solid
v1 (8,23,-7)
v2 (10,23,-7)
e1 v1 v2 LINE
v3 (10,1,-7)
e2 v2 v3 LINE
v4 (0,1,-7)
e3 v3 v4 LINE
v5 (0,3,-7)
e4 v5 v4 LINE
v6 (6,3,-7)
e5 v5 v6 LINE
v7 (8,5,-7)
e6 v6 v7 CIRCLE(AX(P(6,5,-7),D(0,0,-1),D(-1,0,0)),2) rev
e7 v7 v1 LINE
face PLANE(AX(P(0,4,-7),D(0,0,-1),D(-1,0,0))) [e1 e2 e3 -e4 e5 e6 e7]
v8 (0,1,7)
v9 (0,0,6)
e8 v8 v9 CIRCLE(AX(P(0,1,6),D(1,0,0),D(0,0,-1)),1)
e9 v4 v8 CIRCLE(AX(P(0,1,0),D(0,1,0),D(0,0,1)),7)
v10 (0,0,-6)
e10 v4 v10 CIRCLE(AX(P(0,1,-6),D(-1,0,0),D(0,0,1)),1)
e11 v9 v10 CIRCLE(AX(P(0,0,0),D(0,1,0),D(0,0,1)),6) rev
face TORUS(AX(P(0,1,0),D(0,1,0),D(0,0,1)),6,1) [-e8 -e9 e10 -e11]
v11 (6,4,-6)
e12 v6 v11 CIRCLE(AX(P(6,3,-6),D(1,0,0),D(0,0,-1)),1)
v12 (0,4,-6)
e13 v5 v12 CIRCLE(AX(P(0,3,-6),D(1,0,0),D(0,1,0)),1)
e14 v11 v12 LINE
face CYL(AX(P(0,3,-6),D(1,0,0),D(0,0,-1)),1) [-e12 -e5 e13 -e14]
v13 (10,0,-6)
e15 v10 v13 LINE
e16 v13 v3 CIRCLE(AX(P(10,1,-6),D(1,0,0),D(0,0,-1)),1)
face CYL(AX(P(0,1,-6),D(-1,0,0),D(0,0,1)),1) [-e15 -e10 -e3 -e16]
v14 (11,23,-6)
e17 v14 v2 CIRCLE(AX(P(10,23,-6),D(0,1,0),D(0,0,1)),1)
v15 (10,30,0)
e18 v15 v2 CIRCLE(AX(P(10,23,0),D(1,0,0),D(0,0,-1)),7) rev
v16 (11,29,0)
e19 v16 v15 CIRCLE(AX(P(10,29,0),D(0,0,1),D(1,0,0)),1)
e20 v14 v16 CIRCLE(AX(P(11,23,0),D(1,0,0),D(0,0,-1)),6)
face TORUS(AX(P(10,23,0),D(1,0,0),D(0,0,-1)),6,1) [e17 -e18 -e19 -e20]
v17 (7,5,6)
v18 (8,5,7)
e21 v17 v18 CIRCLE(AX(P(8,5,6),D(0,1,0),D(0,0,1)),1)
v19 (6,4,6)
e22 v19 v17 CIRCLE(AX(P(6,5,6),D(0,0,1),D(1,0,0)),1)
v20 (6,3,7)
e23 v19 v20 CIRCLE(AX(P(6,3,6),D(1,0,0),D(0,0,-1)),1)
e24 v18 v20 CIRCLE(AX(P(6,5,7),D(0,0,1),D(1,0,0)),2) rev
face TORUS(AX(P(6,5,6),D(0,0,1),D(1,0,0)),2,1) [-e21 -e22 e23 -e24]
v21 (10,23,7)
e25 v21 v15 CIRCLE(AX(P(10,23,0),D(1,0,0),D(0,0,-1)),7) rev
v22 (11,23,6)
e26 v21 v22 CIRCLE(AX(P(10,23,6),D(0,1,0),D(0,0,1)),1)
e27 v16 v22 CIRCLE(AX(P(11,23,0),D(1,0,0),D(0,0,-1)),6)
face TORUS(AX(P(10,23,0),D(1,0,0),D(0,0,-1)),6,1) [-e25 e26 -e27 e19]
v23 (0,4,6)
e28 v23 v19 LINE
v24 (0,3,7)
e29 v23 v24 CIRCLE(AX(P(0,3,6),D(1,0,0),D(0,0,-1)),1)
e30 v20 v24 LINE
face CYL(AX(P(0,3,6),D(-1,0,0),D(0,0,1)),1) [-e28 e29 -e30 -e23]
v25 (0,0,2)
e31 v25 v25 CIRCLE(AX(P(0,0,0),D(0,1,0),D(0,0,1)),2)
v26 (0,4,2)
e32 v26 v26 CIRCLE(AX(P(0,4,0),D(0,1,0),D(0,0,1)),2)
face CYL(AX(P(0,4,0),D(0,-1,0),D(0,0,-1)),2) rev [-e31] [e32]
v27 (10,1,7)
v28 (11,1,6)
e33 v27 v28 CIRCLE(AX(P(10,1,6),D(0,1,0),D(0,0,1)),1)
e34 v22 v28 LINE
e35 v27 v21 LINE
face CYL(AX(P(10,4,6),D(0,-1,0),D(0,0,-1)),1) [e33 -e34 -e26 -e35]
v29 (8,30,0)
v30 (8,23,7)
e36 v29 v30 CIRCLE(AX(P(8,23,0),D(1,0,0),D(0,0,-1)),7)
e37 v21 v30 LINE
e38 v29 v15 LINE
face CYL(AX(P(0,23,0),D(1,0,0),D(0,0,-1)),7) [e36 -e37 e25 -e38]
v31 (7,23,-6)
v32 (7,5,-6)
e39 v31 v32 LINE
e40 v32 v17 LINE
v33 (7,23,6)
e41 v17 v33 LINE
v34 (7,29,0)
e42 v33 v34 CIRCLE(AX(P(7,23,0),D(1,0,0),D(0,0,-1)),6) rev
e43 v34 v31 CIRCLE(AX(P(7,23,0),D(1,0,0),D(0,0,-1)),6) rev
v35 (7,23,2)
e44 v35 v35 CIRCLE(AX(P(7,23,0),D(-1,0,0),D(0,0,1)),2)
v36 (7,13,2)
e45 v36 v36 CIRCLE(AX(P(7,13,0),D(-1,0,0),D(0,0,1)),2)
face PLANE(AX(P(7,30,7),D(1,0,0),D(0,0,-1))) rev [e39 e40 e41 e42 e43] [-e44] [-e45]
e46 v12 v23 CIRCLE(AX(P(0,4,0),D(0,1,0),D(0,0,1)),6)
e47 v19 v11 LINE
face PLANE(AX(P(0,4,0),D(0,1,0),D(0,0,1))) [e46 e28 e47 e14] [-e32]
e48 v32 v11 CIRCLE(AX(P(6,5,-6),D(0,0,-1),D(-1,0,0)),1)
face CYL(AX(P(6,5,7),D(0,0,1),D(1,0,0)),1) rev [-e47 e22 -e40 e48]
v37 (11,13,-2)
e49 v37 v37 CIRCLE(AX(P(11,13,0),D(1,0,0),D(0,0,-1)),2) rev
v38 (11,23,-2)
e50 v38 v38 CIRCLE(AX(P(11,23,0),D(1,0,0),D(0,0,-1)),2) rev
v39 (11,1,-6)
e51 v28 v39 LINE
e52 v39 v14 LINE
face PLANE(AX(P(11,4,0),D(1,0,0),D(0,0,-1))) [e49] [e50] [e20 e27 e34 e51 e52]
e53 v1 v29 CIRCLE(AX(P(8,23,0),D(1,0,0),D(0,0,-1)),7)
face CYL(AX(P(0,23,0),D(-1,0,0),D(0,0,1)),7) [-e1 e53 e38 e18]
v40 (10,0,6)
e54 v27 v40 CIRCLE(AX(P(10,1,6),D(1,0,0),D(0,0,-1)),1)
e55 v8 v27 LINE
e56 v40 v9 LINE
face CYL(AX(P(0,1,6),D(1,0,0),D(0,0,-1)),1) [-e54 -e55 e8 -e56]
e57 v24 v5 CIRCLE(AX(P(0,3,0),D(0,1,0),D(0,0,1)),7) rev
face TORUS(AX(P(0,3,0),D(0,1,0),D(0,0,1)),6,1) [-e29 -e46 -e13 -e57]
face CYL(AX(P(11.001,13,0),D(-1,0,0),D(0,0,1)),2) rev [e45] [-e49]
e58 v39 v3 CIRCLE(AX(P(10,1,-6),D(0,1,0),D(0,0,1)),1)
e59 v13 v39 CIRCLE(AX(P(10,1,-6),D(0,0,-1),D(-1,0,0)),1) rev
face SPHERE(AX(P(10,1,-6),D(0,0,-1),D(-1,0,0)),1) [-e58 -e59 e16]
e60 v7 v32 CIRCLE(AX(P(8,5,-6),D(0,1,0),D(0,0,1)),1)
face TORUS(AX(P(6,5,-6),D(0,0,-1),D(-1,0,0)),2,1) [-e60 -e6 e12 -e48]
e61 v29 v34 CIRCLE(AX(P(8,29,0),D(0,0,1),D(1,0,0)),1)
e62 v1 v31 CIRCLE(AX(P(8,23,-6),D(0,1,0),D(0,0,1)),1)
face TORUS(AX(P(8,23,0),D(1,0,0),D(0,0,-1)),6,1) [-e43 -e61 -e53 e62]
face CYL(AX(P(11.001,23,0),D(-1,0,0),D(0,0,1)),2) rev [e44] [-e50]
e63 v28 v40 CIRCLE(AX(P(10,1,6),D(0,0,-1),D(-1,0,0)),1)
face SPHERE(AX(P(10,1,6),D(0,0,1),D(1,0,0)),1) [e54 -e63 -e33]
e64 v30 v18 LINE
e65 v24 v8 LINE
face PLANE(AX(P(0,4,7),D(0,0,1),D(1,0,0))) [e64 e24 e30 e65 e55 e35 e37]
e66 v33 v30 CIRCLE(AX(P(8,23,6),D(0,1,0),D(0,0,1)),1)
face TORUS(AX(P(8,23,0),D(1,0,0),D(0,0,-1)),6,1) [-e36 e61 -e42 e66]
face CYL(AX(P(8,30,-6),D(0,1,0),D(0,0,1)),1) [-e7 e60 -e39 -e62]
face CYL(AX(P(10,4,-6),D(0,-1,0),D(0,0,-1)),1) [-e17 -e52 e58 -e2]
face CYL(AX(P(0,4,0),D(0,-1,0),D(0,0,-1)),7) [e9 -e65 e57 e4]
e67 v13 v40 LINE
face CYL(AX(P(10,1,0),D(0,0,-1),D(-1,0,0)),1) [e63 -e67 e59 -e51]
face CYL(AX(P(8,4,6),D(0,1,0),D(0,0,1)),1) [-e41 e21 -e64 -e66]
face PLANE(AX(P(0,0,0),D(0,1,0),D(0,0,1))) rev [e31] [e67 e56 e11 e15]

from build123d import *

# Parameters (mm, degrees)
SKETCH1_R           = 7
SKETCH1_R_2         = 2
BOSS_EXTRUDE1_DEPTH = 4
SKETCH2_W           = 4
SKETCH2_H           = 14
BOSS_EXTRUDE2_DEPTH = 26
CUT_EXTRUDE2_REACH  = 35.838
SKETCH4_R           = 2
FILLET6_R           = 7
FILLET7_R           = 1
FILLET8_R           = 1


with BuildPart() as part:
    # Sketch1 → Boss-Extrude1 (new body)
    # profile 1 of 2: a face of its own
    with BuildSketch(Plane(origin=(0, 0, 0), x_dir=(1, 0, 0), z_dir=(0, 1, 0))):
        Circle(SKETCH1_R)
        with Locations(Location((0, 0, 0), (0, 0, 270))):
            Circle(SKETCH1_R_2, mode=Mode.SUBTRACT)
    # profile 2 of 2: a face of its own
    with BuildSketch(Plane(origin=(0, 0, 0), x_dir=(1, 0, 0), z_dir=(0, 1, 0))):
        with BuildLine():
            Line((11, 7), (0, 7))
            ThreePointArc((0, 7), (4.949747468, 4.949747468), (7, 0))
            ThreePointArc((7, 0), (4.949747468, -4.949747468), (0, -7))
            Line((0, -7), (11, -7))
            Line((11, -7), (11, 7))
        make_face()
    extrude(amount=BOSS_EXTRUDE1_DEPTH)

    # Sketch2 → Boss-Extrude2 (add)
    with BuildSketch(Plane(origin=(0, 4, 0), x_dir=(1, 0, 0), z_dir=(0, 1, 0))):
        with Locations((9, 0)):
            Rectangle(SKETCH2_W, SKETCH2_H)
    extrude(amount=BOSS_EXTRUDE2_DEPTH)

    # Sketch4 → Cut-Extrude2 (cut, up to next)
    with BuildSketch(Plane.ZY.offset(-7), mode=Mode.PRIVATE) as cut_extrude2_sk1:
        with Locations((0, 23)):
            Circle(SKETCH4_R)
    cut_extrude2_tool1 = extrude(cut_extrude2_sk1.sketch, amount=-CUT_EXTRUDE2_REACH, mode=Mode.PRIVATE) & part.part
    # Sketch4 → Cut-Extrude2 (cut, up to next)
    with BuildSketch(Plane.ZY.offset(-7), mode=Mode.PRIVATE) as cut_extrude2_sk2:
        with Locations((0, 13)):
            Circle(SKETCH4_R)
    cut_extrude2_tool2 = extrude(cut_extrude2_sk2.sketch, amount=-CUT_EXTRUDE2_REACH, mode=Mode.PRIVATE) & part.part
    add(cut_extrude2_tool1.solids().sort_by_distance((7, 23, 0))[0], mode=Mode.SUBTRACT)
    add(cut_extrude2_tool2.solids().sort_by_distance((7, 13, 0))[0], mode=Mode.SUBTRACT)

    # Fillet6
    fillet6_edges = [part.edges().sort_by_distance(p)[0] for p in [
        (9, 30, -7),
        (9, 30, 7),
    ]]
    fillet(fillet6_edges, radius=FILLET6_R - 0.0001)  # a hair under: the kernel refuses the full size

    # Fillet7
    fillet7_edges = [part.edges().sort_by_distance(p)[0] for p in [
        (7, 4, 0),
        (11, 0, 0),
    ]]
    fillet(fillet7_edges, radius=FILLET7_R)

    # Fillet8
    fillet8_edges = [part.edges().sort_by_distance(p)[0] for p in [
        (3, 4, -7),
        (7, 14.00005, 7),
        (7, 14.00005, -7),
        (7, 27.949776758, 4.949776758),
        (7, 27.949776758, -4.949776758),
        (11, 12.00005, -7),
        (11, 12.00005, 7),
        (11, 27.949776758, 4.949776758),
        (11, 27.949776758, -4.949776758),
        (5, 0, 7),
        (3, 4, 7),
        (10.707106781, 0.292893219, 7),
        (10.707106781, 0.292893219, -7),
        (6.707106781, 4.292893219, 7),
        (6.707106781, 4.292893219, -7),
        (5, 0, -7),
        (-7, 0, 0),
        (-7, 4, 0),
    ]]
    fillet(fillet8_edges, radius=FILLET8_R)


solid = part.part
